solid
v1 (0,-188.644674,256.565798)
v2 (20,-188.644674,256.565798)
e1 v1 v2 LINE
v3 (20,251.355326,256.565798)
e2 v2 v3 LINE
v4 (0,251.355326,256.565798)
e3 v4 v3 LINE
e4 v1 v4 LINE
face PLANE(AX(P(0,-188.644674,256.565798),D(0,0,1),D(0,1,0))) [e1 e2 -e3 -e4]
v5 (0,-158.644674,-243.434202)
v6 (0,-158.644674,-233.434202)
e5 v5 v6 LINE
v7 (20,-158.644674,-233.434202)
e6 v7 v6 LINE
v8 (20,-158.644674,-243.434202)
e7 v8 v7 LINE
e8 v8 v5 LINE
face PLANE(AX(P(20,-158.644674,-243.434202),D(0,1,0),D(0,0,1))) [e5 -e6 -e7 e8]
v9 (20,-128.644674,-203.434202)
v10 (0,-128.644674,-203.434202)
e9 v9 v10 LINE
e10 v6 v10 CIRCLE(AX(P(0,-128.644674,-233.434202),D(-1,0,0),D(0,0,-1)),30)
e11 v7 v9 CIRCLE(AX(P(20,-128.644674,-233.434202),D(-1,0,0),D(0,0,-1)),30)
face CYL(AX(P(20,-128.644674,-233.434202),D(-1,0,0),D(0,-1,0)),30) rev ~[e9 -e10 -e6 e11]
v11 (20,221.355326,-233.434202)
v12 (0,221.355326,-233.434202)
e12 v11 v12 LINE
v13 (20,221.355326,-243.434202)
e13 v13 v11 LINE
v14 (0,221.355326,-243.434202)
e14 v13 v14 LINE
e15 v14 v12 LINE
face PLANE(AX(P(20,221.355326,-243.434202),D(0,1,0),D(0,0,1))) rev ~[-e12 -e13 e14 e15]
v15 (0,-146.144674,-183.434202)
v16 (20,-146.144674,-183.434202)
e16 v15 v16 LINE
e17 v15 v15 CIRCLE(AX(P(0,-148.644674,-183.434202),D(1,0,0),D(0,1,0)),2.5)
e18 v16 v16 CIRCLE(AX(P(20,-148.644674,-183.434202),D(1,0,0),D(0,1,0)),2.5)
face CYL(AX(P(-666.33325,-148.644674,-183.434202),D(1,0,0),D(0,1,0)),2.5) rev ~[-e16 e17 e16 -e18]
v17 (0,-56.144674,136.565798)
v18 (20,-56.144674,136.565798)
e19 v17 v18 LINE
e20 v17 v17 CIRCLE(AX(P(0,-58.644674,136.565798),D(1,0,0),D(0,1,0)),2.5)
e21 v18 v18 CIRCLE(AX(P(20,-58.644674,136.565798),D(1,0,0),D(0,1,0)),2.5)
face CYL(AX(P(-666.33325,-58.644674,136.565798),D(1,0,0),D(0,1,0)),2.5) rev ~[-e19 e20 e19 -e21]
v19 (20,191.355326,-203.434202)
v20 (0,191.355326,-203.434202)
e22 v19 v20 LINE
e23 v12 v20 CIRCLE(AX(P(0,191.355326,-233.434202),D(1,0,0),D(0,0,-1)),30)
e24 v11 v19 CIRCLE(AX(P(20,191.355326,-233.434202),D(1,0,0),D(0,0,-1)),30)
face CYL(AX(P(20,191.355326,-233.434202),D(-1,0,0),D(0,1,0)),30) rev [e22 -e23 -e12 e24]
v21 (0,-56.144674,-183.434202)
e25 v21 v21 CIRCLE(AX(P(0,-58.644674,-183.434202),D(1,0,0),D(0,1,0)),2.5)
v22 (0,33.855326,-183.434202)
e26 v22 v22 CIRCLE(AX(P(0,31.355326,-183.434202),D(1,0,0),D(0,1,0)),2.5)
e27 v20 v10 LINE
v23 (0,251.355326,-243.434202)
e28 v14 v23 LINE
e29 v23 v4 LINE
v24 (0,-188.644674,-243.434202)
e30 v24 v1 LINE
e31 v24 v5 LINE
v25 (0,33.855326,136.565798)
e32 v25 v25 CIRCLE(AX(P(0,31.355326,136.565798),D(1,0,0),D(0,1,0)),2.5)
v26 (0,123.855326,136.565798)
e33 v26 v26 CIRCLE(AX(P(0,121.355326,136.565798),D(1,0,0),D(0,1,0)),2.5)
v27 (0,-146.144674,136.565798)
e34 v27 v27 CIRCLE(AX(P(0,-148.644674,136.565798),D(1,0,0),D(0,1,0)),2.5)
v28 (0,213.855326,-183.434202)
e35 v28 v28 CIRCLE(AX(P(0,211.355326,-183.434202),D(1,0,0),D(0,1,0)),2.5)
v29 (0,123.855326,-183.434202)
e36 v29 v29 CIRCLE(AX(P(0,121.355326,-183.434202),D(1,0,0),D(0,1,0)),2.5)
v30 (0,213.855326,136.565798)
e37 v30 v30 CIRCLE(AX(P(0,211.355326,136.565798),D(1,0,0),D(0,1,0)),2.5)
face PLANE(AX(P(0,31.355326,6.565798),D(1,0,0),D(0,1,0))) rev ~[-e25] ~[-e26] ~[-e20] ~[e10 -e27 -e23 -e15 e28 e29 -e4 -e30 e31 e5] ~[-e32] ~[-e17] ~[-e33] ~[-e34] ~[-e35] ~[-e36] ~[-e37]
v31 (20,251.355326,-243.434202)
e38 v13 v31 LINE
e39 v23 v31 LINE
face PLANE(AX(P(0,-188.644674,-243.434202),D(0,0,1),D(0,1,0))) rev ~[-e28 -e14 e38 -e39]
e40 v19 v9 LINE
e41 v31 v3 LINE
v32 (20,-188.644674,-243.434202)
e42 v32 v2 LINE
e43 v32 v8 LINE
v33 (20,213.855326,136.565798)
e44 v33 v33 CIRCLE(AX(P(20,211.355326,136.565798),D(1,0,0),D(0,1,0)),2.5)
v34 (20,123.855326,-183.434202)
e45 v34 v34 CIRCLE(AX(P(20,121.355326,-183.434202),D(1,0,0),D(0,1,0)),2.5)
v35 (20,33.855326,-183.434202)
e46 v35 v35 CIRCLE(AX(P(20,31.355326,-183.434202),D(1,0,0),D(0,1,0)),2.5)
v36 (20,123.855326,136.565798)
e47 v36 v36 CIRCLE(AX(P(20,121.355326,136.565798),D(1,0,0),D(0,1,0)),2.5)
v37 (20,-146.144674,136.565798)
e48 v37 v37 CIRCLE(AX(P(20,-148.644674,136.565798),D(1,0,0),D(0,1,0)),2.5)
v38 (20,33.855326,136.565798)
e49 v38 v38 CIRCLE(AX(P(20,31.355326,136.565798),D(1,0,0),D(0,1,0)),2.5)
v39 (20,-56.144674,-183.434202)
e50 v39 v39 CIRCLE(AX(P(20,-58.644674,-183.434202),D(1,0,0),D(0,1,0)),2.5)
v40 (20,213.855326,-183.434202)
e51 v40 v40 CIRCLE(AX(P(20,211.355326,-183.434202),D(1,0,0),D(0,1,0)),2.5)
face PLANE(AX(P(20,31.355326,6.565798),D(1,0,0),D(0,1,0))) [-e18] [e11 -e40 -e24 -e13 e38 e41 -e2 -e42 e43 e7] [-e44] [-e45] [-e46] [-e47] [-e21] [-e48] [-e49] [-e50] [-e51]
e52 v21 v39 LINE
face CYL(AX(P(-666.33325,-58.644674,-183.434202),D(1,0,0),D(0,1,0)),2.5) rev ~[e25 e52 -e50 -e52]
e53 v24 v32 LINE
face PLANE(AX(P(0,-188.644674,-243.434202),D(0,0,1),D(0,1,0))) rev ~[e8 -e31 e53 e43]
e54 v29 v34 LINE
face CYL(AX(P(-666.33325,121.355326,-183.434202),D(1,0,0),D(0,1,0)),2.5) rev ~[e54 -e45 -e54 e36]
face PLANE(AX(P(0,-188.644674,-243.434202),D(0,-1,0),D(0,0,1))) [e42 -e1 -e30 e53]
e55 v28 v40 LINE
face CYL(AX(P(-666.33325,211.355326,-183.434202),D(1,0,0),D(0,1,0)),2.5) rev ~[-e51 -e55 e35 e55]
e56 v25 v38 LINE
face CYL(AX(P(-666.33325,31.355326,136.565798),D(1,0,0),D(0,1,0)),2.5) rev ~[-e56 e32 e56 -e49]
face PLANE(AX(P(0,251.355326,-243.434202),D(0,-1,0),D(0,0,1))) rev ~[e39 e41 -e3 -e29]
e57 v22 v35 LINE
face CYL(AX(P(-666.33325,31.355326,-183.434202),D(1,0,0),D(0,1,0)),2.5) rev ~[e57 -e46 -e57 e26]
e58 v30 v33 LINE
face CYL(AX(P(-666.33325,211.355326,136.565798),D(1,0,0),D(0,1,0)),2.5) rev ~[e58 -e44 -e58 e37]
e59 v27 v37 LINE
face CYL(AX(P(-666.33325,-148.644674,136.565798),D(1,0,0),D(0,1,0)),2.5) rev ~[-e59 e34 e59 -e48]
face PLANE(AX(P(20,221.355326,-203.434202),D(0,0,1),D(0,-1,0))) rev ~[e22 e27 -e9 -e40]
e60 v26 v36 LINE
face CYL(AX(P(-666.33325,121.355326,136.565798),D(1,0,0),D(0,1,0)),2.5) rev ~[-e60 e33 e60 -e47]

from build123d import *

# Parameters (mm, degrees)
F0_W     = 440
F0_H     = 500
F1_DEPTH = 20
F2_W     = 190
F2_H     = 40
F3_DEPTH = 20
F4_R     = 30
F6_D     = 5


# Not quite as in the source:
# - a feature names something its author has since deleted; it is built from what else it names


with BuildPart() as f1:
    # F0 (on Right) → F1 (new body)
    with BuildSketch(Plane.YZ):
        with Locations((31.3553263247, 6.565798074)):
            Rectangle(F0_W, F0_H)
    extrude(amount=F1_DEPTH)

    # F2 (on face) → F3 (cut, through all)
    with BuildSketch(Plane.YZ.offset(20)):
        with Locations((-63.6446736753, -223.434201926)):
            Rectangle(F2_W, F2_H)
        with Locations((126.3553263247, -223.434201926)):
            Rectangle(F2_W, F2_H)
    extrude(amount=-F3_DEPTH, mode=Mode.SUBTRACT)

    # F4
    f4_edges = [f1.edges().sort_by_distance(p)[0] for p in [
        (10, -158.644674, -203.434202),
        (10, 221.355326, -203.434202),
    ]]
    fillet(f4_edges, radius=F4_R)

    # F6 (through all)
    with Locations(Plane(origin=(0, 0, 0), x_dir=(0, -1, 0), z_dir=(-1, 0, 0))):
        with Locations((148.6446736753, -183.434201926), (58.6446736753, -183.434201926), (-31.3553263247, -183.434201926), (-121.3553263247, -183.434201926), (-211.3553263247, -183.434201926), (148.6446736753, 136.565798074), (58.6446736753, 136.565798074), (-31.3553263247, 136.565798074), (-121.3553263247, 136.565798074), (-211.3553263247, 136.565798074)):
            Hole(F6_D / 2)


solid = f1.part
